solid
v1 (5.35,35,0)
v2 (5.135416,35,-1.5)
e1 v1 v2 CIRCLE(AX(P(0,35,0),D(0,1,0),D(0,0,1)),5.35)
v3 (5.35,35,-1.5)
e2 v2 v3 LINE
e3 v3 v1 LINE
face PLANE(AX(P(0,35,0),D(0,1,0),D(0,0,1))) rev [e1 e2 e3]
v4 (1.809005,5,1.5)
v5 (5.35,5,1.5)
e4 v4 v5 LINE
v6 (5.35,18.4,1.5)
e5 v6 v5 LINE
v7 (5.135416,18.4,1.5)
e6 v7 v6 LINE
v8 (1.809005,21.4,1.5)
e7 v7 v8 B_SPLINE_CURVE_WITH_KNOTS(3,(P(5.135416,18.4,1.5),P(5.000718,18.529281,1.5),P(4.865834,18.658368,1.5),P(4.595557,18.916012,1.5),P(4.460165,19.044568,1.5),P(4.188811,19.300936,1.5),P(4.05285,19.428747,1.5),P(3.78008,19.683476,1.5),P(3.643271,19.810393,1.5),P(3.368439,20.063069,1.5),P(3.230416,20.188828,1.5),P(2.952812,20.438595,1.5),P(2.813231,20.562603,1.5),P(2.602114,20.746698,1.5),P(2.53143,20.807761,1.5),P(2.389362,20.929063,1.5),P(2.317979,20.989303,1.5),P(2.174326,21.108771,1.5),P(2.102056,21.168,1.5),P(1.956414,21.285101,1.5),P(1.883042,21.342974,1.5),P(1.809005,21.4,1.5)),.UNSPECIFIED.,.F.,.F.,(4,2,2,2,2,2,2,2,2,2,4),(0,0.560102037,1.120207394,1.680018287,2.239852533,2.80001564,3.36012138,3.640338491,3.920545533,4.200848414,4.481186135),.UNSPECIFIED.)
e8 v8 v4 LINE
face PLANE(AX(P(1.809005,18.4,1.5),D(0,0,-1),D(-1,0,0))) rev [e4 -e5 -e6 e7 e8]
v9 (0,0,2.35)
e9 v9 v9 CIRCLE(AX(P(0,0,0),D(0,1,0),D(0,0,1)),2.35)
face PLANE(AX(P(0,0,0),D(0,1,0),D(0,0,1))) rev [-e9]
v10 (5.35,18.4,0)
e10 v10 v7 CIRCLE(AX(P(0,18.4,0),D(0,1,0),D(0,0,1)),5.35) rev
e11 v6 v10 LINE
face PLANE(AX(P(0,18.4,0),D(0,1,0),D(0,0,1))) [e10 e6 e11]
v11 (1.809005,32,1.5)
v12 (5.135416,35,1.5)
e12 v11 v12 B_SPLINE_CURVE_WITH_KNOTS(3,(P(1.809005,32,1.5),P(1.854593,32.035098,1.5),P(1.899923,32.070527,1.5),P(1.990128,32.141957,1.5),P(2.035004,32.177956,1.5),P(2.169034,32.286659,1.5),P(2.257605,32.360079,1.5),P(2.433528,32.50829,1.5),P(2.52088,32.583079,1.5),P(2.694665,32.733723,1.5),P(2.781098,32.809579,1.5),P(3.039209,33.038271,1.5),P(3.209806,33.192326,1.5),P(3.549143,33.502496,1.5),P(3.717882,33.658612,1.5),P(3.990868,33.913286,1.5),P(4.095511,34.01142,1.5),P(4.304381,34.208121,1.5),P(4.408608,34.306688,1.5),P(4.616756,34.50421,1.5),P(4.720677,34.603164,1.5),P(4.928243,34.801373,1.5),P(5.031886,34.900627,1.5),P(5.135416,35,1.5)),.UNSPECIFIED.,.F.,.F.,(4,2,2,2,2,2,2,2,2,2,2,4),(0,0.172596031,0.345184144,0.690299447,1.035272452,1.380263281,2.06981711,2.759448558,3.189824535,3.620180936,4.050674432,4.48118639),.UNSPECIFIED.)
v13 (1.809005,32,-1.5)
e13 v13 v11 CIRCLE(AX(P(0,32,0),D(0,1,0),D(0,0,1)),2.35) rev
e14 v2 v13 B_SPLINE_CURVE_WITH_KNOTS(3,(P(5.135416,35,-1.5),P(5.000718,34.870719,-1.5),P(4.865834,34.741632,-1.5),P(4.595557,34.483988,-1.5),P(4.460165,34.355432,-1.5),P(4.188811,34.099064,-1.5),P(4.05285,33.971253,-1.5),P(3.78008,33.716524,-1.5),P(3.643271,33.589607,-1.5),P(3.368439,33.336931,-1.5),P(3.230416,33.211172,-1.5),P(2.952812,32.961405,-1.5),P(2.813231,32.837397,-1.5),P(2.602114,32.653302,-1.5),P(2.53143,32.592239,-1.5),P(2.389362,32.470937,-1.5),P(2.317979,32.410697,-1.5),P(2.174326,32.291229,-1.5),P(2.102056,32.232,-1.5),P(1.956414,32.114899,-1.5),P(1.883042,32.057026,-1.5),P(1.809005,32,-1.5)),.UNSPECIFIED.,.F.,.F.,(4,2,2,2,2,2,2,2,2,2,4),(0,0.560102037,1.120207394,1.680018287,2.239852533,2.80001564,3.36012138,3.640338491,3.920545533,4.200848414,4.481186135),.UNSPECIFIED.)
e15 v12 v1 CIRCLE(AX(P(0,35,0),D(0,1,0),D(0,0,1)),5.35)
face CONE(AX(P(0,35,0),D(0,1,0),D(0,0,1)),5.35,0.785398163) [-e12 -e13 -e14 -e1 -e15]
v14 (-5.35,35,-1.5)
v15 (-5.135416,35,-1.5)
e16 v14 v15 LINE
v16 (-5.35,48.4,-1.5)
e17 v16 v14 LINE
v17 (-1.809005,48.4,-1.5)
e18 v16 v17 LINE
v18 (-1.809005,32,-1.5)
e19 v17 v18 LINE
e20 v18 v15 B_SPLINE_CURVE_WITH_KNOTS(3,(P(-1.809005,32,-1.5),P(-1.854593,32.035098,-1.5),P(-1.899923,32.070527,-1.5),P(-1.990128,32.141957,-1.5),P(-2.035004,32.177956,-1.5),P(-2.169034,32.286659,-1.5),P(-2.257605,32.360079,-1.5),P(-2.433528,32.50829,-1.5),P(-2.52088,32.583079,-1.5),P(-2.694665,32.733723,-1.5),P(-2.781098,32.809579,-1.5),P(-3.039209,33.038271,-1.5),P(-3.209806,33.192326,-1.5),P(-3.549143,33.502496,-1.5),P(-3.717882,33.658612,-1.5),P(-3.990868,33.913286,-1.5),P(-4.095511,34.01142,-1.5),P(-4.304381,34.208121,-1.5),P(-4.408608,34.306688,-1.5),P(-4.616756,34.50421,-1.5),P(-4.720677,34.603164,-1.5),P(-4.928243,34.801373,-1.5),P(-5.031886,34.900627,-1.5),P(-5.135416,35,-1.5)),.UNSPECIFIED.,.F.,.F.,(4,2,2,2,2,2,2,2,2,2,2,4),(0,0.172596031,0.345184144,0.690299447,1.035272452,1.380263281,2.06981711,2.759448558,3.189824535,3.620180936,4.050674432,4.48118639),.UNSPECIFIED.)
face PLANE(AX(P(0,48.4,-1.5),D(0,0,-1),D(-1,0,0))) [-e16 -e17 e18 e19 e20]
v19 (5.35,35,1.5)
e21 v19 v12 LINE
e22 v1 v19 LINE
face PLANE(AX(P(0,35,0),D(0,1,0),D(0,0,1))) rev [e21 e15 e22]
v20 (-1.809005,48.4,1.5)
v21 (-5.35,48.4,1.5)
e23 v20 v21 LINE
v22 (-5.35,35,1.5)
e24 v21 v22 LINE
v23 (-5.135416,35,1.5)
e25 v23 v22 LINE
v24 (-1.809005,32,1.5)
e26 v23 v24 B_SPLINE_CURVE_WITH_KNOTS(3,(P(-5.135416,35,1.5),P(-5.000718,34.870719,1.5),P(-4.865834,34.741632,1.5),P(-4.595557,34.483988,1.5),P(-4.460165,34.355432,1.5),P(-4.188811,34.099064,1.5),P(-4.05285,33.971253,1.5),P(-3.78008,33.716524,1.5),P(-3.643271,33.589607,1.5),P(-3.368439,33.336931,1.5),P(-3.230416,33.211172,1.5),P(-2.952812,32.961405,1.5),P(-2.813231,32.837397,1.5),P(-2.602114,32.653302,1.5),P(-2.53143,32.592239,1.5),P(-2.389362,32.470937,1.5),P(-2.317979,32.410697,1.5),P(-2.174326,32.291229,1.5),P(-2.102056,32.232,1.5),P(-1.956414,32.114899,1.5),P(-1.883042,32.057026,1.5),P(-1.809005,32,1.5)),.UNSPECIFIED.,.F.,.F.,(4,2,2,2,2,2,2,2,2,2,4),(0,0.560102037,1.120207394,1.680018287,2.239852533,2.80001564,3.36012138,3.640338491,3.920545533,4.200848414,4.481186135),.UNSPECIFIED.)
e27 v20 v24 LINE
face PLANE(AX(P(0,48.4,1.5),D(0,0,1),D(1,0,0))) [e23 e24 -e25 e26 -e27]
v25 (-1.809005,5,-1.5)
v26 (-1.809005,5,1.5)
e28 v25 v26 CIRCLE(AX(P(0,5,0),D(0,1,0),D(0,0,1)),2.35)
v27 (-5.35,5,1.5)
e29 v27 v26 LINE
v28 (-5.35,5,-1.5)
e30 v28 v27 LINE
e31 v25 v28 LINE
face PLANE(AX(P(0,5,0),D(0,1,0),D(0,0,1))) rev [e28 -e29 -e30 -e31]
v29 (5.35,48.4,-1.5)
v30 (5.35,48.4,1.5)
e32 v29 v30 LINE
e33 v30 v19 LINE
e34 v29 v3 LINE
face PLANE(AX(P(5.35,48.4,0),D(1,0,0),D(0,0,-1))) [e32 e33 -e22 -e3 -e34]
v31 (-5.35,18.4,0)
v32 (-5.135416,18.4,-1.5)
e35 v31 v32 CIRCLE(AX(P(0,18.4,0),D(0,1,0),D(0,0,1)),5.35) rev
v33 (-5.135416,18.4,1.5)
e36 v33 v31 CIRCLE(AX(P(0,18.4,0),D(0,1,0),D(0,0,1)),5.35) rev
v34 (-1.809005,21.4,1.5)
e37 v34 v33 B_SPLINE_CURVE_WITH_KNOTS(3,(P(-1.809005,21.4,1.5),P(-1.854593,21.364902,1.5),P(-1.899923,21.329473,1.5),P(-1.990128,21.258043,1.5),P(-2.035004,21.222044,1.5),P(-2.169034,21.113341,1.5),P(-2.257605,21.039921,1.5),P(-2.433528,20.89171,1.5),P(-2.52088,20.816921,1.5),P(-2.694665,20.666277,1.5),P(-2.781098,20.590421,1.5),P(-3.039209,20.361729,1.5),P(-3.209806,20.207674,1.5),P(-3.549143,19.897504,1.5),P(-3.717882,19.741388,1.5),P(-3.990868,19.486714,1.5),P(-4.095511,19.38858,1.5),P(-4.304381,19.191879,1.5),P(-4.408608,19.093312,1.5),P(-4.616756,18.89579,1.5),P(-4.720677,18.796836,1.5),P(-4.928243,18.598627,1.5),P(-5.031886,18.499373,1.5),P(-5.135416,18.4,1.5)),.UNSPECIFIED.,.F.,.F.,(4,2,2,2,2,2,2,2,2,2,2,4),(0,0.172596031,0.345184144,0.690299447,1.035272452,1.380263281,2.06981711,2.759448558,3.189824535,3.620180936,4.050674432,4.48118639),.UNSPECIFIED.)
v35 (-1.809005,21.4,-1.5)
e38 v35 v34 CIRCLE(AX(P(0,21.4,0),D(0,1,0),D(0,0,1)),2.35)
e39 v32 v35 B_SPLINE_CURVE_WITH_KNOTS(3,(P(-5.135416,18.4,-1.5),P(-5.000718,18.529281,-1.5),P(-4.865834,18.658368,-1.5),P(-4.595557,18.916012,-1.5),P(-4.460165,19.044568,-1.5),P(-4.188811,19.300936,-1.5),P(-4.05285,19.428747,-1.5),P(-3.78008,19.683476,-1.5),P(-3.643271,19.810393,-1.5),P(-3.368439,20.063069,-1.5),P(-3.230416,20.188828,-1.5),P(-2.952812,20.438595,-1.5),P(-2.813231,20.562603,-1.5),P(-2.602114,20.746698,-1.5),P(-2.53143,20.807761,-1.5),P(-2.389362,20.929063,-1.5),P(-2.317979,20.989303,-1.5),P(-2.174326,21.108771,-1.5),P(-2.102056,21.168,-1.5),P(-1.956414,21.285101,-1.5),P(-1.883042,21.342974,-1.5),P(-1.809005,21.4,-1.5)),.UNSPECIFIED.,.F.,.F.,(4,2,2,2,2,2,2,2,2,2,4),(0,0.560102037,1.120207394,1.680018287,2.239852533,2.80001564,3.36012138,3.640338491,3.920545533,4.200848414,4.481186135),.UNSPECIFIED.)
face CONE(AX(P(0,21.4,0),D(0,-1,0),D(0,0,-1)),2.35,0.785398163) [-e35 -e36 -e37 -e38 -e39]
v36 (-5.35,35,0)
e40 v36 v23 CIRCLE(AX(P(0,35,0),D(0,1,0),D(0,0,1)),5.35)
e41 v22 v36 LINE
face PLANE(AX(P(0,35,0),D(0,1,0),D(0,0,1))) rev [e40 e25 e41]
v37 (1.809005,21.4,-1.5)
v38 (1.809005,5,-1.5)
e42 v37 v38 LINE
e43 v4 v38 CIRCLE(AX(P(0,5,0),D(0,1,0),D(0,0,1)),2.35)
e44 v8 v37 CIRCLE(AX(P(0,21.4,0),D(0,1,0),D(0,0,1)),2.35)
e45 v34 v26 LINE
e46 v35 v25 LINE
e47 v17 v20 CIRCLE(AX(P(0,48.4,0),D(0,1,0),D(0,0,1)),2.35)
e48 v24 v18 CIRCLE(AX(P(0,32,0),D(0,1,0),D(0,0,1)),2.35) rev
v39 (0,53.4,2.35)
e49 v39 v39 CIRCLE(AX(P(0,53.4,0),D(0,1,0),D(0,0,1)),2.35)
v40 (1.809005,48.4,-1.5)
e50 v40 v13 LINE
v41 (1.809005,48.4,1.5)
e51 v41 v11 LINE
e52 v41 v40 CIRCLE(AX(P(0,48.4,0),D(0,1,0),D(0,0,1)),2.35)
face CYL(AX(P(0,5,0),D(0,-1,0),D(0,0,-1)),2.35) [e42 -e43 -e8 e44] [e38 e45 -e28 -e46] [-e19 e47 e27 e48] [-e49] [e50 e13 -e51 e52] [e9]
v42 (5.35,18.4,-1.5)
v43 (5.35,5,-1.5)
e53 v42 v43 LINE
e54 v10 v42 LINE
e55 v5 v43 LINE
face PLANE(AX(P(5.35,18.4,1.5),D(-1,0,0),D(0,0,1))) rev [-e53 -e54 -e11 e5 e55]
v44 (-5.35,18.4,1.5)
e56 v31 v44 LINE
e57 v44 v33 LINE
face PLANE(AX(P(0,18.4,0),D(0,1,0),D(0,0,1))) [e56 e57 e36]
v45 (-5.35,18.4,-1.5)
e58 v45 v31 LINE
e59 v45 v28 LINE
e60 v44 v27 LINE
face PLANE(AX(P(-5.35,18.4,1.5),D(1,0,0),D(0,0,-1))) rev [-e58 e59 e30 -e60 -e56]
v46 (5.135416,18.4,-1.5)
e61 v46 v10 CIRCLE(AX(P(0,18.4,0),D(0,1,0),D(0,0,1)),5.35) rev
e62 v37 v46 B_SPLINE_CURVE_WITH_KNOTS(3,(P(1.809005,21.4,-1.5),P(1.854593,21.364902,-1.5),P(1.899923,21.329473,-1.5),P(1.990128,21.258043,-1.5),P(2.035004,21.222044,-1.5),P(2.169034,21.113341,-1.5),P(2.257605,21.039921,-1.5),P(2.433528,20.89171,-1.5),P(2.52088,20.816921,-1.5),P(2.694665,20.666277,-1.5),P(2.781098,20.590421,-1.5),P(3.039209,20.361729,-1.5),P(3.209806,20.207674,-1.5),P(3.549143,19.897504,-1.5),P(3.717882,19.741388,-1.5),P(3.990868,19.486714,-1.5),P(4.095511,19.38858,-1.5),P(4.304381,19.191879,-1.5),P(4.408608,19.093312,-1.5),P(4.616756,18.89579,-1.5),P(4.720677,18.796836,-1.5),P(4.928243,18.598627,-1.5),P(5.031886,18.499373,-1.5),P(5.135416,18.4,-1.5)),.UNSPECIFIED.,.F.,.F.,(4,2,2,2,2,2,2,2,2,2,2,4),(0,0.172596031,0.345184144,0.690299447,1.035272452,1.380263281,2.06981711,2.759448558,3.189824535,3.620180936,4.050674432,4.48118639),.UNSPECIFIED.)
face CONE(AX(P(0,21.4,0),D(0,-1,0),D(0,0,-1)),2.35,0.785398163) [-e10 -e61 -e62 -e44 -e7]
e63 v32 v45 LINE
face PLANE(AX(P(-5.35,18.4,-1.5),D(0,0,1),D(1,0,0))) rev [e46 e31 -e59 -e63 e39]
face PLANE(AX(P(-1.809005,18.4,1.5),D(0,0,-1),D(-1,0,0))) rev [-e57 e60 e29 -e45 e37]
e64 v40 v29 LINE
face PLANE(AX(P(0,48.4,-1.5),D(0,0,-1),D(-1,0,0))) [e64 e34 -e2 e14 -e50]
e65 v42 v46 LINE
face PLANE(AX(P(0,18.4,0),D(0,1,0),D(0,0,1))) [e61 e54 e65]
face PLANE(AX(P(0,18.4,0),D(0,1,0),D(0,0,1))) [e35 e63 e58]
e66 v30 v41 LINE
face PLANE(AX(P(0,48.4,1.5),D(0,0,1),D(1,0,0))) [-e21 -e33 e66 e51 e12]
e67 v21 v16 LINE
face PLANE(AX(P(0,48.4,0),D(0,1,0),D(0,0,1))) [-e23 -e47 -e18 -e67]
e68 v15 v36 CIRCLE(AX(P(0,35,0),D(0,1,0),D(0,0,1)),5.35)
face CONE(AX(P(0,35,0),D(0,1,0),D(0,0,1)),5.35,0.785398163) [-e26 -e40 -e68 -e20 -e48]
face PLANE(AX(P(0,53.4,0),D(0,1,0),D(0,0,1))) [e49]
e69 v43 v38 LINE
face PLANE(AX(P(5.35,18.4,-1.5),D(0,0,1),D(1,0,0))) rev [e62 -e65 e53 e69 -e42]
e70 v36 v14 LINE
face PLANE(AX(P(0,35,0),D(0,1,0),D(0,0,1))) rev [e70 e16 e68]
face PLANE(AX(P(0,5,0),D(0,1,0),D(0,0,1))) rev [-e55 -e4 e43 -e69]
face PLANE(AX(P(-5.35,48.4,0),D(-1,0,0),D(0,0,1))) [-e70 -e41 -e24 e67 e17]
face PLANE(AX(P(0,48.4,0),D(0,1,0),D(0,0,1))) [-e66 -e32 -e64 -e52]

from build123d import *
from build123d.topology import SkipClean

# Parameters (mm, degrees)
SKETCH1_R           = 2.35
BOSS_EXTRUDE1_DEPTH = 5
BOSS_EXTRUDE2_DEPTH = 13.4
BOSS_EXTRUDE3_START = 18.4
SKETCH1_2_R         = 2.35
BOSS_EXTRUDE3_DEPTH = 16.6
BOSS_EXTRUDE4_START = 30
SKETCH2_2_R         = 2.35
BOSS_EXTRUDE4_DEPTH = 13.4
BOSS_EXTRUDE5_START = 48.4
SKETCH1_3_R         = 2.35
BOSS_EXTRUDE5_DEPTH = 5
CHAMFER1_SIZE       = 3


with BuildPart() as part:
    # Sketch1 → Boss-Extrude1 (new body)
    with BuildSketch(Plane(origin=(0, 0, 0), x_dir=(1, 0, 0), z_dir=(0, 1, 0))):
        with Locations(Location((0, 0, 0), (0, 0, 270))):
            Circle(SKETCH1_R)
    extrude(amount=BOSS_EXTRUDE1_DEPTH)

    # Sketch2 → Boss-Extrude2 (add)
    with SkipClean():  # the faces are left unmerged after this step: merging them gives an invalid solid
        with BuildSketch(Plane(origin=(0, 5, 0), x_dir=(1, 0, 0), z_dir=(0, 1, 0))):
            with BuildLine():
                Line((-1.809005, -1.5), (-5.35, -1.5))
                Line((-5.35, -1.5), (-5.35, 1.5))
                Line((-5.35, 1.5), (-1.809005, 1.5))
                ThreePointArc((-1.809005, 1.5), (0, 2.35), (1.809005, 1.5))
                Line((1.809005, 1.5), (5.35, 1.5))
                Line((5.35, 1.5), (5.35, -1.5))
                Line((5.35, -1.5), (1.809005, -1.5))
                ThreePointArc((1.809005, -1.5), (0, -2.35), (-1.809005, -1.5))
            make_face()
        extrude(amount=BOSS_EXTRUDE2_DEPTH)

    # Sketch1<2> → Boss-Extrude3 (add)
    with SkipClean():  # the faces are left unmerged after this step: merging them gives an invalid solid
        with BuildSketch(Plane(origin=(0, 0, 0), x_dir=(1, 0, 0), z_dir=(0, 1, 0)).offset(BOSS_EXTRUDE3_START)):
            with Locations(Location((0, 0, 0), (0, 0, 270))):
                Circle(SKETCH1_2_R)
        extrude(amount=BOSS_EXTRUDE3_DEPTH)

    # Sketch2<2> → Boss-Extrude4 (add)
    with SkipClean():  # the faces are left unmerged after this step: merging them gives an invalid solid
        with BuildSketch(Plane(origin=(0, 5, 0), x_dir=(1, 0, 0), z_dir=(0, 1, 0)).offset(BOSS_EXTRUDE4_START)):
            with Locations(Location((0, 0, 0), (0, 0, 140.334987))):
                Circle(SKETCH2_2_R)
            with BuildLine():
                Line((-1.809005, -1.5), (-5.35, -1.5))
                Line((-5.35, -1.5), (-5.35, 1.5))
                Line((-5.35, 1.5), (-1.809005, 1.5))
                ThreePointArc((-1.809005, 1.5), (0, 2.35), (1.809005, 1.5))
                Line((1.809005, 1.5), (5.35, 1.5))
                Line((5.35, 1.5), (5.35, -1.5))
                Line((5.35, -1.5), (1.809005, -1.5))
                ThreePointArc((1.809005, -1.5), (0, -2.35), (-1.809005, -1.5))
            make_face()
        extrude(amount=BOSS_EXTRUDE4_DEPTH)

    # Sketch1<3> → Boss-Extrude5 (add)
    with SkipClean():  # the faces are left unmerged after this step: merging them gives an invalid solid
        with BuildSketch(Plane(origin=(0, 0, 0), x_dir=(1, 0, 0), z_dir=(0, 1, 0)).offset(BOSS_EXTRUDE5_START)):
            with Locations(Location((0, 0, 0), (0, 0, 270))):
                Circle(SKETCH1_3_R)
        extrude(amount=BOSS_EXTRUDE5_DEPTH)

    # Chamfer1
    # the kernel refuses this chamfer: 3 mm, written as the material it adds along each edge
    with BuildSketch(Plane(origin=(0, 18.4, 0), x_dir=(0.9999950652018581, 0, -0.0031415874858791225), z_dir=(0.0031415874858791225, 0, 0.9999950652018581))) as chamfer1_piece_1_section:
        Polygon((2.35, CHAMFER1_SIZE), (2.35 + CHAMFER1_SIZE, 0), (2.35, 0), align=None)
    chamfer1_piece_1 = revolve(axis=Axis((0, 18.4, 0), (0, 1, 0)), revolution_arc=359.64, mode=Mode.PRIVATE)
    chamfer1_piece_1 = split(chamfer1_piece_1, bisect_by=Plane(origin=(3.194483, 19.397878, 1.5), z_dir=(0, 0, -1)), keep=Keep.TOP, mode=Mode.PRIVATE)
    chamfer1_piece_1 = split(chamfer1_piece_1, bisect_by=Plane(origin=(3.194483, 19.397878, -1.5), z_dir=(0, 0, 1)), keep=Keep.TOP, mode=Mode.PRIVATE)
    chamfer1_piece_1 = split(chamfer1_piece_1, bisect_by=Plane(origin=(-5.35, 19.397878, -0.77195), z_dir=(1, 0, 0)), keep=Keep.TOP, mode=Mode.PRIVATE)
    add(chamfer1_piece_1)
    with BuildSketch(Plane(origin=(0, 18.4, 0), x_dir=(-0.9999950652018581, 0, 0.0031415874858796884), z_dir=(-0.0031415874858796884, 0, -0.9999950652018581))) as chamfer1_piece_2_section:
        Polygon((2.35, CHAMFER1_SIZE), (2.35 + CHAMFER1_SIZE, 0), (2.35, 0), align=None)
    chamfer1_piece_2 = revolve(axis=Axis((0, 18.4, 0), (0, 1, 0)), revolution_arc=359.64, mode=Mode.PRIVATE)
    chamfer1_piece_2 = split(chamfer1_piece_2, bisect_by=Plane(origin=(-3.194483, 19.397878, 1.5), z_dir=(0, 0, -1)), keep=Keep.TOP, mode=Mode.PRIVATE)
    chamfer1_piece_2 = split(chamfer1_piece_2, bisect_by=Plane(origin=(-3.194483, 19.397878, -1.5), z_dir=(0, 0, 1)), keep=Keep.TOP, mode=Mode.PRIVATE)
    chamfer1_piece_2 = split(chamfer1_piece_2, bisect_by=Plane(origin=(5.35, 19.397878, 0.77195), z_dir=(-1, 0, 0)), keep=Keep.TOP, mode=Mode.PRIVATE)
    add(chamfer1_piece_2)
    with BuildSketch(Plane(origin=(0, 35, 0), x_dir=(-0.9999950652018581, 0, 0.0031415874858796884), z_dir=(-0.0031415874858796884, 0, -0.9999950652018581))) as chamfer1_piece_3_section:
        Polygon((2.35, -CHAMFER1_SIZE), (2.35 + CHAMFER1_SIZE, 0), (2.35, 0), align=None)
    chamfer1_piece_3 = revolve(axis=Axis((0, 35, 0), (0, 1, 0)), revolution_arc=359.64, mode=Mode.PRIVATE)
    chamfer1_piece_3 = split(chamfer1_piece_3, bisect_by=Plane(origin=(-3.194483, 34.002122, 1.5), z_dir=(0, 0, -1)), keep=Keep.TOP, mode=Mode.PRIVATE)
    chamfer1_piece_3 = split(chamfer1_piece_3, bisect_by=Plane(origin=(-3.194483, 34.002122, -1.5), z_dir=(0, 0, 1)), keep=Keep.TOP, mode=Mode.PRIVATE)
    chamfer1_piece_3 = split(chamfer1_piece_3, bisect_by=Plane(origin=(5.35, 34.002122, 0.77195), z_dir=(-1, 0, 0)), keep=Keep.TOP, mode=Mode.PRIVATE)
    add(chamfer1_piece_3)
    with BuildSketch(Plane(origin=(0, 35, 0), x_dir=(0.9999950652018625, 0, -0.0031415874844589325), z_dir=(0.0031415874844589325, 0, 0.9999950652018625))) as chamfer1_piece_4_section:
        Polygon((2.35, -CHAMFER1_SIZE), (2.35 + CHAMFER1_SIZE, 0), (2.35, 0), align=None)
    chamfer1_piece_4 = revolve(axis=Axis((0, 35, 0), (0, 1, 0)), revolution_arc=359.64, mode=Mode.PRIVATE)
    chamfer1_piece_4 = split(chamfer1_piece_4, bisect_by=Plane(origin=(3.194483, 34.002122, 1.5), z_dir=(0, 0, -1)), keep=Keep.TOP, mode=Mode.PRIVATE)
    chamfer1_piece_4 = split(chamfer1_piece_4, bisect_by=Plane(origin=(-5.35, 34.002122, -0.77195), z_dir=(1, 0, 0)), keep=Keep.TOP, mode=Mode.PRIVATE)
    chamfer1_piece_4 = split(chamfer1_piece_4, bisect_by=Plane(origin=(3.194483, 34.002122, -1.5), z_dir=(0, 0, 1)), keep=Keep.TOP, mode=Mode.PRIVATE)
    add(chamfer1_piece_4)


solid = part.part
